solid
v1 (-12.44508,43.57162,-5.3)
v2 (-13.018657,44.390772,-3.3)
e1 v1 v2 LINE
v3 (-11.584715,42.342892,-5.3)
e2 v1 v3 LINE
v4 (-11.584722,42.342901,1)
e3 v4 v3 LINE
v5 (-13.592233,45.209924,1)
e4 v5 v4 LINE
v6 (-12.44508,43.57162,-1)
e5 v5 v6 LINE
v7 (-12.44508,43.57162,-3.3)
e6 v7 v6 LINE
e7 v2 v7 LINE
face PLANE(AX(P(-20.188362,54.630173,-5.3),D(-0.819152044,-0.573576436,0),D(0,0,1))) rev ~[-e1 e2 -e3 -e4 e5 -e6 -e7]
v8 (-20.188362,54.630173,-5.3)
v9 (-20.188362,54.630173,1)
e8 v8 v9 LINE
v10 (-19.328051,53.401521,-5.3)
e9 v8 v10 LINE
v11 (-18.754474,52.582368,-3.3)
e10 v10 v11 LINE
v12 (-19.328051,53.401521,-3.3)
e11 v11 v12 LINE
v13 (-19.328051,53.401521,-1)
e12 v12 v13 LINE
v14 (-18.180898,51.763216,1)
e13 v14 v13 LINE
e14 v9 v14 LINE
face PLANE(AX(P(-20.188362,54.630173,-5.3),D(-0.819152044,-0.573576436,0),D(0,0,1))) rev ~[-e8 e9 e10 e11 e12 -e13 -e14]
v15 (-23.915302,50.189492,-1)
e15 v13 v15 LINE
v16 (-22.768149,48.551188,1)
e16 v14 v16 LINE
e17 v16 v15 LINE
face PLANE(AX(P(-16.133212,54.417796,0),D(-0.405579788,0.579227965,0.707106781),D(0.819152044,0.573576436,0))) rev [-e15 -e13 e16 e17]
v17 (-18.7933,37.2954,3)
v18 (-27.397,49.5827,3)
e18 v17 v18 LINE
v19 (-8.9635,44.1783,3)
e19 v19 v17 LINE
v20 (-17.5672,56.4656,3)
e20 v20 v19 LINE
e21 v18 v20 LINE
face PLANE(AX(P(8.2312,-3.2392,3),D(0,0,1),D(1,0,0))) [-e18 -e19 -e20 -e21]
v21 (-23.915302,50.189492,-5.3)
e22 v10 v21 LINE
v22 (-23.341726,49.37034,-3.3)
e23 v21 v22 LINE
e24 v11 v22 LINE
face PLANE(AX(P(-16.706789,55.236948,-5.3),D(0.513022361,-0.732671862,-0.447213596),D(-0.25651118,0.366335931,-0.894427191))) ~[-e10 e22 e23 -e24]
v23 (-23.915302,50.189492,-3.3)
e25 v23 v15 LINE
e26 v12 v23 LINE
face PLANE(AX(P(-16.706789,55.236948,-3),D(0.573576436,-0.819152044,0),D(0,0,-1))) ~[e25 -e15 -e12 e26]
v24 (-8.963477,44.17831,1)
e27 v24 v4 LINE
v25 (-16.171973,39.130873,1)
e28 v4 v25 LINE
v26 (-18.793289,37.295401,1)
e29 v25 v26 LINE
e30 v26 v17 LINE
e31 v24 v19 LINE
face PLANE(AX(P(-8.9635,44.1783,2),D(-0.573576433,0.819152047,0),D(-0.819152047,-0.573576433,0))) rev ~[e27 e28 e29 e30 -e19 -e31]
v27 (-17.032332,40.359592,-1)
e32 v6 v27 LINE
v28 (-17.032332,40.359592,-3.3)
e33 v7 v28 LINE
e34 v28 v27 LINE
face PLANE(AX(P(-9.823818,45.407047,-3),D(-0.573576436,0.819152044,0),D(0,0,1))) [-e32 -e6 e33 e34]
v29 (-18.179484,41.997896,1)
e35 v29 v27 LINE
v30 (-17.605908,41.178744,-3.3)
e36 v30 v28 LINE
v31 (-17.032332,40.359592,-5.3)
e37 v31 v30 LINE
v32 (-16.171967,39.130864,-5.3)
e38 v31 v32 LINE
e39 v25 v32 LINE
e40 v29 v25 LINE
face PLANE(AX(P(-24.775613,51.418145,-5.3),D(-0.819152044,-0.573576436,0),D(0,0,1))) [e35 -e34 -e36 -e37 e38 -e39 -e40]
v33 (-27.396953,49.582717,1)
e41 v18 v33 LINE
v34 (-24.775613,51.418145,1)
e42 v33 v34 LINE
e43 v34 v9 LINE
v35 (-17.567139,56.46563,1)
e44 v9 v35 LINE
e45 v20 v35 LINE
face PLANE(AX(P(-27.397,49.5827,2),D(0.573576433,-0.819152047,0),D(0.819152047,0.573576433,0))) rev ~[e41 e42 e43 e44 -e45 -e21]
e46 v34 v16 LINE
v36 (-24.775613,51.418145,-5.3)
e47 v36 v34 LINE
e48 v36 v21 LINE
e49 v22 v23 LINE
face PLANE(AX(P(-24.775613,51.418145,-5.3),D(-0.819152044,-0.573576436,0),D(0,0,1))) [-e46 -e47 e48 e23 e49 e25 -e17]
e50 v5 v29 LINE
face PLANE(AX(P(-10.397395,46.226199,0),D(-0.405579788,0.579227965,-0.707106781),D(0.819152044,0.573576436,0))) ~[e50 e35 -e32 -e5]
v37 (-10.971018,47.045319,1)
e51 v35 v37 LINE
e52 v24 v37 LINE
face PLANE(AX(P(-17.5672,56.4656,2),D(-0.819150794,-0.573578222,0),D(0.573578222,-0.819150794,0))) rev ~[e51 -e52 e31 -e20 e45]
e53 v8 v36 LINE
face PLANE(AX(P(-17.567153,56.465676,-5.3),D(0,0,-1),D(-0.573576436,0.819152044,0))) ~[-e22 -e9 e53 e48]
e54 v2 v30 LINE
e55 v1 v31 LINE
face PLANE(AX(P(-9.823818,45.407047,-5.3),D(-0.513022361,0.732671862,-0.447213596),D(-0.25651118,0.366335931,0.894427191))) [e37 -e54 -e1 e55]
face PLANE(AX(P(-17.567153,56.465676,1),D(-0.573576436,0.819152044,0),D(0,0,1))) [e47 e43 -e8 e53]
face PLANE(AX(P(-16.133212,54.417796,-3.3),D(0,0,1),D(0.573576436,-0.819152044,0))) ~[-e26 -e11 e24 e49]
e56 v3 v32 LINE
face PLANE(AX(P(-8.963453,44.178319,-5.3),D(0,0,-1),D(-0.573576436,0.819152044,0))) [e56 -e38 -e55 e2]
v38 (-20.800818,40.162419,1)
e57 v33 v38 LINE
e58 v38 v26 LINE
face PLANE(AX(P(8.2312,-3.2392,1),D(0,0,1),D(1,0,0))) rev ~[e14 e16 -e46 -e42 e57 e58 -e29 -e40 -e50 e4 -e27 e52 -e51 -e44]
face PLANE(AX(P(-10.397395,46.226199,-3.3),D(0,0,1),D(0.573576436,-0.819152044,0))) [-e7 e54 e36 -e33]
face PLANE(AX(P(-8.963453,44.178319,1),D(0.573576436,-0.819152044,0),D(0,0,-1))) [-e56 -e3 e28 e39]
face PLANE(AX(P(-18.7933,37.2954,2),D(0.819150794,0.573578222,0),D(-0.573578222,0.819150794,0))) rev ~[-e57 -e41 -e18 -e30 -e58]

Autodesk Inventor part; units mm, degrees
ref_plane "YZ Plane" through (0, 0, 0) normal (1, 0, 0) x (0, 1, 0)
ref_plane "XZ Plane" through (0, 0, 0) normal (0, 1, 0) x (-1, 0, 0)
ref_plane "XY Plane" through (0, 0, 0) normal (0, 0, 1) x (1, 0, 0)
ref_plane "Arbeitsebene1" through (8.2312, -3.2392, 2) normal (0, 0, 1) x (1, 0, 0)
sketch "Skizze1" plane through (8.2312, -3.2392, 2) normal (0, 0, 1) x (1, 0, 0)
  arc A0 (-29.666, 52.3362) -> (-30.2278, 49.15) centre (-26.4114, 50.1197) ccw projected
  line L0 (-30.4697, 49.0886) -> (-31.8651, 51.0813) projected
  line L1 (-27.3731, 44.6661) -> (-28.7684, 46.6589) projected
  line L2 (-25.3803, 46.0614) -> (-27.3731, 44.6661) projected
  spline S0 degree 3 poles (-25.3803, 46.0614) (-25.4758, 46.0372) (-25.5717, 46.0164) (-25.765, 45.9815) (-25.8623, 45.9675) (-25.9823, 45.9545) (-26.0046, 45.9522) (-26.0633, 45.9468) (-26.0993, 45.944) (-26.1701, 45.9393) (-26.2048, 45.9374) (-26.2421, 45.9359) (-26.244, 45.9358) (-26.3578, 45.9313) (-26.4696, 45.9314) (-26.6928, 45.9405) (-26.8042, 45.9495) (-26.9899, 45.972) (-27.0643, 45.983) (-27.2355, 46.0132) (-27.3315, 46.0336) (-27.5218, 46.0812) (-27.6161, 46.1083) (-27.7358, 46.1473) (-27.7619, 46.1561) (-27.8204, 46.1765) (-27.8532, 46.1884) (-27.9183, 46.2129) (-27.9507, 46.2255) (-27.9876, 46.2405) (-27.9928, 46.2426) (-28.0892, 46.282) (-28.1788, 46.3225) (-28.3547, 46.4094) (-28.4411, 46.456) (-28.6083, 46.5538) (-28.6891, 46.6048) (-28.7684, 46.6589) knots 0 0 0 0 0.084049 0.084049 0.16831 0.16831 0.1875 0.1875 0.21875 0.21875 0.248427 0.248427 0.25 0.25 0.343462 0.343462 0.437098 0.437098 0.5 0.5 0.582124 0.582124 0.664424 0.664424 0.6875 0.6875 0.716281 0.716281 0.74522 0.74522 0.75 0.75 0.834095 0.834095 0.918237 0.918237 1 1 1 1 projected
  line L3 (-20.9578, 49.1581) -> (-22.9506, 47.7627) projected
  line L4 (-22.3532, 51.1509) -> (-20.9578, 49.1581) projected
  spline S1 degree 3 poles (-22.3532, 51.1509) (-22.3289, 51.0554) (-22.3081, 50.9594) (-22.2732, 50.7662) (-22.2592, 50.6689) (-22.2462, 50.5488) (-22.244, 50.5265) (-22.2385, 50.4679) (-22.2357, 50.4318) (-22.231, 50.3611) (-22.2292, 50.3263) (-22.2276, 50.289) (-22.2276, 50.2871) (-22.2231, 50.1733) (-22.2231, 50.0616) (-22.2322, 49.8384) (-22.2412, 49.727) (-22.2637, 49.5413) (-22.2747, 49.4668) (-22.3049, 49.2957) (-22.3254, 49.1997) (-22.3729, 49.0094) (-22.4, 48.915) (-22.4391, 48.7954) (-22.4479, 48.7693) (-22.4682, 48.7107) (-22.4801, 48.678) (-22.5046, 48.6128) (-22.5173, 48.5804) (-22.5322, 48.5436) (-22.5343, 48.5384) (-22.5738, 48.442) (-22.6142, 48.3524) (-22.7012, 48.1764) (-22.7477, 48.09) (-22.8455, 47.9229) (-22.8966, 47.842) (-22.9506, 47.7627) knots 0 0 0 0 0.084049 0.084049 0.16831 0.16831 0.1875 0.1875 0.21875 0.21875 0.248427 0.248427 0.25 0.25 0.343462 0.343462 0.437098 0.437098 0.5 0.5 0.582124 0.582124 0.664424 0.664424 0.6875 0.6875 0.716281 0.716281 0.74522 0.74522 0.75 0.75 0.834095 0.834095 0.918237 0.918237 1 1 1 1 projected
  line L5 (-25.4498, 55.5734) -> (-24.0545, 53.5806) projected
  line L6 (-27.4426, 54.178) -> (-25.4498, 55.5734) projected
  spline S2 degree 3 poles (-27.4426, 54.178) (-27.3471, 54.2023) (-27.2511, 54.2231) (-27.0579, 54.2579) (-26.9606, 54.272) (-26.8406, 54.285) (-26.8183, 54.2872) (-26.7596, 54.2926) (-26.7236, 54.2955) (-26.6528, 54.3001) (-26.6181, 54.302) (-26.5807, 54.3035) (-26.5789, 54.3036) (-26.4651, 54.3081) (-26.3533, 54.308) (-26.1301, 54.299) (-26.0187, 54.29) (-25.833, 54.2675) (-25.7586, 54.2564) (-25.5874, 54.2262) (-25.4914, 54.2058) (-25.3011, 54.1582) (-25.2067, 54.1311) (-25.0871, 54.0921) (-25.061, 54.0833) (-25.0025, 54.0629) (-24.9697, 54.0511) (-24.9046, 54.0266) (-24.8722, 54.0139) (-24.8353, 53.999) (-24.8301, 53.9969) (-24.7337, 53.9574) (-24.6441, 53.917) (-24.4681, 53.83) (-24.3817, 53.7835) (-24.2146, 53.6857) (-24.1337, 53.6346) (-24.0545, 53.5806) knots 0 0 0 0 0.084049 0.084049 0.16831 0.16831 0.1875 0.1875 0.21875 0.21875 0.248427 0.248427 0.25 0.25 0.343462 0.343462 0.437098 0.437098 0.5 0.5 0.582124 0.582124 0.664424 0.664424 0.6875 0.6875 0.716281 0.716281 0.74522 0.74522 0.75 0.75 0.834095 0.834095 0.918237 0.918237 1 1 1 1 projected
  line L7 (-27.0245, 40.5346) -> (-35.6282, 52.8219)
  line L8 (-35.6282, 52.8219) -> (-25.7984, 59.7048)
  line L9 (-25.7984, 59.7048) -> (-17.1947, 47.4175)
  line L10 (-17.1947, 47.4175) -> (-27.0245, 40.5346)
  line L11 (-27.0245, 40.5346) -> (-25.7984, 59.7048) construction
  line L12 (-35.6282, 52.8219) -> (-17.1947, 47.4175) construction
  line L13 (-27.0245, 40.5346) -> (-12.0245, 40.5346) construction
  circle A1 centre (-26.4114, 50.1197) radius 4.5
  circle A2 centre (-26.4114, 50.1197) radius 3.95
  point P0 (-8.2312, 3.2392)
  point P1 (-24.4756, 54.182)
  point P2 (-21.932, 50.5494)
  point P3 (-22.3491, 48.1839)
  point P4 (-25.9817, 45.6403)
  point P5 (-28.3473, 46.0574)
  point P6 (-26.8411, 54.5992)
  dimension "d0" = 125
  dimension "d1" = 15
  dimension "d2" = 12
  dimension "d3" = 9
  dimension "d16" = 7.9
extrude "Extrusion1" add sketch "Skizze1" along normal mid plane 2 contours L1 A1 L2 | A1 L6 S2 L5 L4 S1 L3 L2 S0 L1 | L1 S0 L2 A1 | A1 L4 L3 | L3 S1 L4 A1 | A1 L5 S2 L6 | L6 L5 A1 | L7 L8 L9 L10 | A2
sketch "Skizze2" plane through (-17.5671, 56.4656, 3) normal (0.819152, 0.5735764, 0) x (0, 0, -1)
  line L0 (2, 0) -> (2, -15) projected
  line L1 (2, 0) -> (0, 0) projected
  line L2 (0, -15) -> (0, 0) projected
  line L3 (0, -15) -> (2, -15) projected
  line L4 (2, 0) -> (2, -15) projected
  line L5 (2, -15) -> (8.3, -15)
  line L6 (8.3, -15) -> (8.3, -13.5)
  line L7 (8.3, -13.5) -> (6.3, -12.5)
  line L8 (6.3, -12.5) -> (6.3, -13.5)
  line L9 (6.3, -13.5) -> (2, -13.5)
  line L10 (6, -33.1362) -> (6, 10.1688) projected
  point P0 (3, -56.33)
  point P1 (2, -13.5)
  dimension "d6" = 1.5
  dimension "d7" = 0
  dimension "d8" = 1
  dimension "d9" = 0.3
  dimension "d10" = 2
extrude "Extrusion2" add sketch "Skizze2" against normal up to surface (12 mm away) contours L9 L10 L5 L0 | L9 L8 L7 L6 L5 L10
chamfer "Fase1" distance 2 angle 45 1 edges at (-14.7388, 41.9656, 1)
ref_plane "Arbeitsebene2" through (-13.2653, 50.322, -5.3) normal (0.5735764, -0.819152, 0) x (0.819152, 0.5735764, 0)
mirror "Spiegeln1" about plane through (-13.2653, 50.322, -5.3) normal (0.5735764, -0.819152, 0) of "Extrusion2", "Fase1"
sketch "Skizze3" plane through (-27.3969, 49.5827, 3) normal (-0.5735764, 0.819152, 0) x (0.819152, 0.5735764, 0)
  line L0 (0, 8.3) -> (0, 0) projected
  line L1 (12, 8.3) -> (12, 0) projected
  line L2 (0, 8.3) -> (3.2, 8.3)
  line L3 (3.2, 8.3) -> (3.2, 2)
  line L4 (3.2, 2) -> (0, 2)
  line L5 (0, 2) -> (0, 8.3)
  line L6 (12, 8.3) -> (8.8, 8.3)
  line L7 (8.8, 8.3) -> (8.8, 2)
  line L8 (8.8, 2) -> (12, 2)
  line L9 (12, 2) -> (12, 8.3)
  point P0 (-5.9972, 3)
  point P1 (12, 2)
  point P2 (0, 2)
  dimension "d19" = 3.2
  dimension "d20" = 3.2
extrude "Extrusion3" cut sketch "Skizze3" against normal through all
properties part number "Omniscope_Camera_fix"
